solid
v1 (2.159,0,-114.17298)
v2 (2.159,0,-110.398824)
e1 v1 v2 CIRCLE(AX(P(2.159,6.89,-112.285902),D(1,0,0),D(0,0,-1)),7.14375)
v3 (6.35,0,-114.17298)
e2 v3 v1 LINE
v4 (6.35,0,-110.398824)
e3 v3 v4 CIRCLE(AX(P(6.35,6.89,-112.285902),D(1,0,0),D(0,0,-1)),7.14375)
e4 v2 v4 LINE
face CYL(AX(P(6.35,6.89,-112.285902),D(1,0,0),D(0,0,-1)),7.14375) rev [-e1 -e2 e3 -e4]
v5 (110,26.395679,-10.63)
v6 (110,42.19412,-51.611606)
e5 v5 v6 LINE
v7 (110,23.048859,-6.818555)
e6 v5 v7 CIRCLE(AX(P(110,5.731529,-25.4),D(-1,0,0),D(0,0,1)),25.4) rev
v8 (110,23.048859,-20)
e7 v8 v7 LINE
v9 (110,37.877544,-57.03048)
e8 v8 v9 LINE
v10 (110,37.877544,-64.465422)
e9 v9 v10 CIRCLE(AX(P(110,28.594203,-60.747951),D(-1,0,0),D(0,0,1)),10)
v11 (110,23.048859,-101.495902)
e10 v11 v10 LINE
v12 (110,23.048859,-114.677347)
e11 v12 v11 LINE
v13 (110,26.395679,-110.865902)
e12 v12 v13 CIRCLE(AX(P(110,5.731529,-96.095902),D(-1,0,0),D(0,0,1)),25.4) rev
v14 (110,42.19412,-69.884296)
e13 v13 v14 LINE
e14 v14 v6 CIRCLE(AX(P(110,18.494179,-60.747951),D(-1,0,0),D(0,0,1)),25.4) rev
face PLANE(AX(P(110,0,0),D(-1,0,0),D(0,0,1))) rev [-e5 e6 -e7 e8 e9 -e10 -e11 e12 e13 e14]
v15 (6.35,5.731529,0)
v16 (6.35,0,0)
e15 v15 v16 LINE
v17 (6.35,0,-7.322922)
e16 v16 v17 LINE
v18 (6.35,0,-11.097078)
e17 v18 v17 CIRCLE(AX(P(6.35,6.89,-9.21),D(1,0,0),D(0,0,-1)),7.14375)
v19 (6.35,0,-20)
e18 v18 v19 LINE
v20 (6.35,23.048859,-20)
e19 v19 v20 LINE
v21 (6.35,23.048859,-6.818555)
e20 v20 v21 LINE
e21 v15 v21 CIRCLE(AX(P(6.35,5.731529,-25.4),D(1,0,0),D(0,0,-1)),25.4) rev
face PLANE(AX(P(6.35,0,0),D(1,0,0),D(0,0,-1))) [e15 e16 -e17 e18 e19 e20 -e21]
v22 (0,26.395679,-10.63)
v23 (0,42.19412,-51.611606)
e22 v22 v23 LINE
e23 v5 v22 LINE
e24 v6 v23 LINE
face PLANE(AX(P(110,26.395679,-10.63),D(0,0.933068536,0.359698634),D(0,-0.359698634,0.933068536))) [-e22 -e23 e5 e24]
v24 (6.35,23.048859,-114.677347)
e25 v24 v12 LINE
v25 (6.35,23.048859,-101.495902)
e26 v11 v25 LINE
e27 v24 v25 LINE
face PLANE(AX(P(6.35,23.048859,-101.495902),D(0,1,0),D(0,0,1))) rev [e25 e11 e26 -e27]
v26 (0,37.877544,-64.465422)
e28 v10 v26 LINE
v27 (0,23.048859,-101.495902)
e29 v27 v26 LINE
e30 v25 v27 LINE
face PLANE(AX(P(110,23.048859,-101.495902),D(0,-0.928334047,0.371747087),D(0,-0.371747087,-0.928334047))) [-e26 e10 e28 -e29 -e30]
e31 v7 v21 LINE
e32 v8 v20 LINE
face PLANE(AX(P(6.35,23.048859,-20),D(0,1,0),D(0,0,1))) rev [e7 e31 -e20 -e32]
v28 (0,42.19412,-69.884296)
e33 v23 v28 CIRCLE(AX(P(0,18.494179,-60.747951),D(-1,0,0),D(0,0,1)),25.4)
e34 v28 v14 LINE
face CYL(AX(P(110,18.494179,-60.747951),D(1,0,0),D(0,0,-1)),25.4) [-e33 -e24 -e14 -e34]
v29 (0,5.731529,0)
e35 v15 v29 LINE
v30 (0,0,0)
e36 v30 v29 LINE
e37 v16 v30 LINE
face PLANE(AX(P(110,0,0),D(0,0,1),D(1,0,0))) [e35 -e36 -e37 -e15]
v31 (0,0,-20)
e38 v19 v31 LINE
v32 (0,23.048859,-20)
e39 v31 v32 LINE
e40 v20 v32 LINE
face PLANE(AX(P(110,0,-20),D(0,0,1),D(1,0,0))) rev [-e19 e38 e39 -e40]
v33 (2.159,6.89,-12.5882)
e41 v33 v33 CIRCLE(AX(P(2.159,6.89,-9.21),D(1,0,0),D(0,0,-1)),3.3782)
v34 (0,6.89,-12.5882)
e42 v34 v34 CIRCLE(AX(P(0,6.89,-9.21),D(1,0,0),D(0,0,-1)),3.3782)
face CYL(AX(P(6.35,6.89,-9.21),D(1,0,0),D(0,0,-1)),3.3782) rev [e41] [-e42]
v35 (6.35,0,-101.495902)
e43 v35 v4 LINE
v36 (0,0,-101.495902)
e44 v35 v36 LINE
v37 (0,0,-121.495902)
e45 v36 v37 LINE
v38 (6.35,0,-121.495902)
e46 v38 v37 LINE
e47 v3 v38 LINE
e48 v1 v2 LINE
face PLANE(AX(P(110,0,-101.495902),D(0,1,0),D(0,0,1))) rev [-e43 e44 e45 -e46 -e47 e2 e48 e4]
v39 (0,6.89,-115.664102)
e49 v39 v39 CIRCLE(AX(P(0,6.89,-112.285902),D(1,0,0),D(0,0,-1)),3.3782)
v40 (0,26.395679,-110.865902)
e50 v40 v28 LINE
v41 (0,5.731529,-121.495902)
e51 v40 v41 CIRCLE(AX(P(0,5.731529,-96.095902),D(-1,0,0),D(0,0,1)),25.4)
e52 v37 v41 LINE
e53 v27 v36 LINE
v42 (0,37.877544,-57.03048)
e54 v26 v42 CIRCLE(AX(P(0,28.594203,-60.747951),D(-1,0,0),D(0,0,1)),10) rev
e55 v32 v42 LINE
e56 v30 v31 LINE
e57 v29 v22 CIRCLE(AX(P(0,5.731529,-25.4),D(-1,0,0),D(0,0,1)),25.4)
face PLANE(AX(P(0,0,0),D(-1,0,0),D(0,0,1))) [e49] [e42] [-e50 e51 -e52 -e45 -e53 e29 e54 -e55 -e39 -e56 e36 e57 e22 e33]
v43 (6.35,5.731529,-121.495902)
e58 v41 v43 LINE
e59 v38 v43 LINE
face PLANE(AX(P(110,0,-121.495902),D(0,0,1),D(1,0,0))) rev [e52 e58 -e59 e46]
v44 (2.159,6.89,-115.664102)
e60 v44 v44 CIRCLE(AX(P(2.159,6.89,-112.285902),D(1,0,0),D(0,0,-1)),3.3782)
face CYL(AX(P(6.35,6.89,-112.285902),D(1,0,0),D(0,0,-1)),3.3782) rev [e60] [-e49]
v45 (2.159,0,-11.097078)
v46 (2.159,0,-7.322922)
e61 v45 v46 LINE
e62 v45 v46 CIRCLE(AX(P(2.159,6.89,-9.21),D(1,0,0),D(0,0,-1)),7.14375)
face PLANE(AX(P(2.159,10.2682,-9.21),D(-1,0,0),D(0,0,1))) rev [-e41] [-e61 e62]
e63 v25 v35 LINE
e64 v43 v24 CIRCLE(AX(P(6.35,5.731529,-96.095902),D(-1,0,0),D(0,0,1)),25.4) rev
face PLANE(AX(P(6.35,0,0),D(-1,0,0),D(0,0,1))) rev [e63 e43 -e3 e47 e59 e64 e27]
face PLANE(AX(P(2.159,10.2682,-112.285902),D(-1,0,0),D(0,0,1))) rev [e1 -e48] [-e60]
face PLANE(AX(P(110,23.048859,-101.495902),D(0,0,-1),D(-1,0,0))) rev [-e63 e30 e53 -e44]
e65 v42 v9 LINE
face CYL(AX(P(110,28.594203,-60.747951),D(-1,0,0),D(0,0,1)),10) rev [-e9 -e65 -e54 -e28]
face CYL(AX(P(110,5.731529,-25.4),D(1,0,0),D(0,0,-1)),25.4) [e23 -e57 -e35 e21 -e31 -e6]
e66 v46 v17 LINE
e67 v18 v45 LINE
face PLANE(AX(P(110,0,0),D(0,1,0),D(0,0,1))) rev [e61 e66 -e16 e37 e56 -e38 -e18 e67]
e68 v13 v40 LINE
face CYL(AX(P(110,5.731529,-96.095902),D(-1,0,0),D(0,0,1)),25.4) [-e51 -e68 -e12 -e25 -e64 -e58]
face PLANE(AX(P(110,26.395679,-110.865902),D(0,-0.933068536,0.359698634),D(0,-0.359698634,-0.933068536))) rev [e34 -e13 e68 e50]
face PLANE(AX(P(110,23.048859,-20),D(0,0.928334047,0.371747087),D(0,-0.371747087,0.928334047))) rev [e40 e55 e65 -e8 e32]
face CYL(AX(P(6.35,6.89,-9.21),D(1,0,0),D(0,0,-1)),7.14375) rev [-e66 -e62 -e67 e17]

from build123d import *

# Parameters (mm, degrees)
BOSS_EXTRUDE1_DEPTH                                  = 110
FILLET1_R                                            = 25.4
FILLET2_R                                            = 10
SKETCH2_W                                            = 20
SKETCH2_H                                            = 23.04885876
CUT_EXTRUDE1_DEPTH                                   = 103.65
CBORE_FOR_1_4_BINDING_HEAD_MACHINE_SCREW_D           = 6.7564
CBORE_FOR_1_4_BINDING_HEAD_MACHINE_SCREW_CBORE_D     = 14.2875
CBORE_FOR_1_4_BINDING_HEAD_MACHINE_SCREW_CBORE_DEPTH = 4.191


with BuildPart() as part:
    # Sketch1 → Boss-Extrude1 (new body)
    with BuildSketch(Plane(origin=(0, 0, 0), x_dir=(0, 0, -1), z_dir=(1, 0, 0))):
        Polygon((0, 0), (20, 0), (20, 23.04885876), (60.747951032, 39.36618781), (101.495902064, 23.04885876), (101.495902064, 0), (121.495902064, 0), (121.495902064, 26.395679347), (110.865902064, 26.395679347), (60.747951032, 45.71618781), (10.63, 26.395679347), (0, 26.395679347), align=None)
    extrude(amount=BOSS_EXTRUDE1_DEPTH)

    # Fillet1
    # the kernel refuses this fillet: 25.4 mm, written as the material it takes off along each edge
    with BuildSketch(Plane(origin=(-51.660375289, 26.395679347, -121.495902064), x_dir=(0, -1, 0), z_dir=(1, 0, 0))) as fillet1_piece_1:
        with BuildLine():
            CenterArc((20.664150116, -25.4), FILLET1_R, 90, 54.444163321)
            Line((0, -10.63), (-0.413283002, -10.3346))
            ThreePointArc((-0.413283002, -10.3346), (-0.508, -5.315), (-0.508, 0))
            Line((-0.508, 0), (0, 0.508))
            Line((0, 0.508), (20.664150116, 0.508))
            Line((20.664150116, 0.508), (20.664150116, 0))
        make_face()
    extrude(amount=213.320750578, mode=Mode.SUBTRACT)
    with BuildSketch(Plane(origin=(-51.660375289, 26.395679347, 0), x_dir=(0, 0, -1), z_dir=(1, 0, 0))) as fillet1_piece_2:
        with BuildLine():
            CenterArc((25.4, -20.664150116), FILLET1_R, 125.555836679, 54.444163321)
            Line((0, -20.664150116), (-0.508, -20.664150116))
            Line((-0.508, -20.664150116), (-0.508, 0))
            Line((-0.508, 0), (0, 0.508))
            ThreePointArc((0, 0.508), (5.315, 0.508), (10.3346, 0.413283002))
            Line((10.3346, 0.413283002), (10.63, 0))
        make_face()
    extrude(amount=213.320750578, mode=Mode.SUBTRACT)
    with BuildSketch(Plane(origin=(-24.479298578, 45.71618781, -60.747951032), x_dir=(0, -0.35969863434758087, -0.9330685357724187), z_dir=(1, 0, 0))) as fillet1_piece_3:
        with BuildLine():
            CenterArc((FILLET1_R * 0.385500765011, -FILLET1_R), FILLET1_R, 90, 42.163378571)
            Line((-FILLET1_R * 0.285746191129, -FILLET1_R * 0.258766215103), (-FILLET1_R * 0.299171130252, -FILLET1_R * 0.243941539405))
            Line((-FILLET1_R * 0.299171130252, -FILLET1_R * 0.243941539405), (-FILLET1_R * 0.00771001530021, FILLET1_R * 0.02))
            Line((-FILLET1_R * 0.00771001530021, FILLET1_R * 0.02), (FILLET1_R * 0.385500765011, FILLET1_R * 0.02))
            Line((FILLET1_R * 0.385500765011, FILLET1_R * 0.02), (FILLET1_R * 0.385500765011, 0))
        make_face()
    extrude(amount=158.958597156, mode=Mode.SUBTRACT)

    # Fillet2
    fillet2_edges = [part.edges().sort_by_distance(p)[0] for p in [
        (55, 39.36618781, -60.747951032),
    ]]
    fillet(fillet2_edges, radius=FILLET2_R)

    # Sketch2 → Cut-Extrude1 (cut)
    with BuildSketch(Plane(origin=(110, 0, 0), x_dir=(0, 0, -1), z_dir=(1, 0, 0))):
        with Locations((10, 11.52442938)):
            Rectangle(SKETCH2_W, SKETCH2_H)
        with Locations((111.495902064, 11.52442938)):
            Rectangle(SKETCH2_W, SKETCH2_H)
    extrude(amount=-CUT_EXTRUDE1_DEPTH, mode=Mode.SUBTRACT)

    # CBORE for 1/4 Binding Head Machine Screw1 (through all)
    with Locations(Plane(origin=(6.35, 0, 0), x_dir=(0, 0, -1), z_dir=(1, 0, 0))):
        with Locations((9.21, 6.89), (112.285902064, 6.89)):
            CounterBoreHole(CBORE_FOR_1_4_BINDING_HEAD_MACHINE_SCREW_D / 2, CBORE_FOR_1_4_BINDING_HEAD_MACHINE_SCREW_CBORE_D / 2, CBORE_FOR_1_4_BINDING_HEAD_MACHINE_SCREW_CBORE_DEPTH)


solid = part.part
